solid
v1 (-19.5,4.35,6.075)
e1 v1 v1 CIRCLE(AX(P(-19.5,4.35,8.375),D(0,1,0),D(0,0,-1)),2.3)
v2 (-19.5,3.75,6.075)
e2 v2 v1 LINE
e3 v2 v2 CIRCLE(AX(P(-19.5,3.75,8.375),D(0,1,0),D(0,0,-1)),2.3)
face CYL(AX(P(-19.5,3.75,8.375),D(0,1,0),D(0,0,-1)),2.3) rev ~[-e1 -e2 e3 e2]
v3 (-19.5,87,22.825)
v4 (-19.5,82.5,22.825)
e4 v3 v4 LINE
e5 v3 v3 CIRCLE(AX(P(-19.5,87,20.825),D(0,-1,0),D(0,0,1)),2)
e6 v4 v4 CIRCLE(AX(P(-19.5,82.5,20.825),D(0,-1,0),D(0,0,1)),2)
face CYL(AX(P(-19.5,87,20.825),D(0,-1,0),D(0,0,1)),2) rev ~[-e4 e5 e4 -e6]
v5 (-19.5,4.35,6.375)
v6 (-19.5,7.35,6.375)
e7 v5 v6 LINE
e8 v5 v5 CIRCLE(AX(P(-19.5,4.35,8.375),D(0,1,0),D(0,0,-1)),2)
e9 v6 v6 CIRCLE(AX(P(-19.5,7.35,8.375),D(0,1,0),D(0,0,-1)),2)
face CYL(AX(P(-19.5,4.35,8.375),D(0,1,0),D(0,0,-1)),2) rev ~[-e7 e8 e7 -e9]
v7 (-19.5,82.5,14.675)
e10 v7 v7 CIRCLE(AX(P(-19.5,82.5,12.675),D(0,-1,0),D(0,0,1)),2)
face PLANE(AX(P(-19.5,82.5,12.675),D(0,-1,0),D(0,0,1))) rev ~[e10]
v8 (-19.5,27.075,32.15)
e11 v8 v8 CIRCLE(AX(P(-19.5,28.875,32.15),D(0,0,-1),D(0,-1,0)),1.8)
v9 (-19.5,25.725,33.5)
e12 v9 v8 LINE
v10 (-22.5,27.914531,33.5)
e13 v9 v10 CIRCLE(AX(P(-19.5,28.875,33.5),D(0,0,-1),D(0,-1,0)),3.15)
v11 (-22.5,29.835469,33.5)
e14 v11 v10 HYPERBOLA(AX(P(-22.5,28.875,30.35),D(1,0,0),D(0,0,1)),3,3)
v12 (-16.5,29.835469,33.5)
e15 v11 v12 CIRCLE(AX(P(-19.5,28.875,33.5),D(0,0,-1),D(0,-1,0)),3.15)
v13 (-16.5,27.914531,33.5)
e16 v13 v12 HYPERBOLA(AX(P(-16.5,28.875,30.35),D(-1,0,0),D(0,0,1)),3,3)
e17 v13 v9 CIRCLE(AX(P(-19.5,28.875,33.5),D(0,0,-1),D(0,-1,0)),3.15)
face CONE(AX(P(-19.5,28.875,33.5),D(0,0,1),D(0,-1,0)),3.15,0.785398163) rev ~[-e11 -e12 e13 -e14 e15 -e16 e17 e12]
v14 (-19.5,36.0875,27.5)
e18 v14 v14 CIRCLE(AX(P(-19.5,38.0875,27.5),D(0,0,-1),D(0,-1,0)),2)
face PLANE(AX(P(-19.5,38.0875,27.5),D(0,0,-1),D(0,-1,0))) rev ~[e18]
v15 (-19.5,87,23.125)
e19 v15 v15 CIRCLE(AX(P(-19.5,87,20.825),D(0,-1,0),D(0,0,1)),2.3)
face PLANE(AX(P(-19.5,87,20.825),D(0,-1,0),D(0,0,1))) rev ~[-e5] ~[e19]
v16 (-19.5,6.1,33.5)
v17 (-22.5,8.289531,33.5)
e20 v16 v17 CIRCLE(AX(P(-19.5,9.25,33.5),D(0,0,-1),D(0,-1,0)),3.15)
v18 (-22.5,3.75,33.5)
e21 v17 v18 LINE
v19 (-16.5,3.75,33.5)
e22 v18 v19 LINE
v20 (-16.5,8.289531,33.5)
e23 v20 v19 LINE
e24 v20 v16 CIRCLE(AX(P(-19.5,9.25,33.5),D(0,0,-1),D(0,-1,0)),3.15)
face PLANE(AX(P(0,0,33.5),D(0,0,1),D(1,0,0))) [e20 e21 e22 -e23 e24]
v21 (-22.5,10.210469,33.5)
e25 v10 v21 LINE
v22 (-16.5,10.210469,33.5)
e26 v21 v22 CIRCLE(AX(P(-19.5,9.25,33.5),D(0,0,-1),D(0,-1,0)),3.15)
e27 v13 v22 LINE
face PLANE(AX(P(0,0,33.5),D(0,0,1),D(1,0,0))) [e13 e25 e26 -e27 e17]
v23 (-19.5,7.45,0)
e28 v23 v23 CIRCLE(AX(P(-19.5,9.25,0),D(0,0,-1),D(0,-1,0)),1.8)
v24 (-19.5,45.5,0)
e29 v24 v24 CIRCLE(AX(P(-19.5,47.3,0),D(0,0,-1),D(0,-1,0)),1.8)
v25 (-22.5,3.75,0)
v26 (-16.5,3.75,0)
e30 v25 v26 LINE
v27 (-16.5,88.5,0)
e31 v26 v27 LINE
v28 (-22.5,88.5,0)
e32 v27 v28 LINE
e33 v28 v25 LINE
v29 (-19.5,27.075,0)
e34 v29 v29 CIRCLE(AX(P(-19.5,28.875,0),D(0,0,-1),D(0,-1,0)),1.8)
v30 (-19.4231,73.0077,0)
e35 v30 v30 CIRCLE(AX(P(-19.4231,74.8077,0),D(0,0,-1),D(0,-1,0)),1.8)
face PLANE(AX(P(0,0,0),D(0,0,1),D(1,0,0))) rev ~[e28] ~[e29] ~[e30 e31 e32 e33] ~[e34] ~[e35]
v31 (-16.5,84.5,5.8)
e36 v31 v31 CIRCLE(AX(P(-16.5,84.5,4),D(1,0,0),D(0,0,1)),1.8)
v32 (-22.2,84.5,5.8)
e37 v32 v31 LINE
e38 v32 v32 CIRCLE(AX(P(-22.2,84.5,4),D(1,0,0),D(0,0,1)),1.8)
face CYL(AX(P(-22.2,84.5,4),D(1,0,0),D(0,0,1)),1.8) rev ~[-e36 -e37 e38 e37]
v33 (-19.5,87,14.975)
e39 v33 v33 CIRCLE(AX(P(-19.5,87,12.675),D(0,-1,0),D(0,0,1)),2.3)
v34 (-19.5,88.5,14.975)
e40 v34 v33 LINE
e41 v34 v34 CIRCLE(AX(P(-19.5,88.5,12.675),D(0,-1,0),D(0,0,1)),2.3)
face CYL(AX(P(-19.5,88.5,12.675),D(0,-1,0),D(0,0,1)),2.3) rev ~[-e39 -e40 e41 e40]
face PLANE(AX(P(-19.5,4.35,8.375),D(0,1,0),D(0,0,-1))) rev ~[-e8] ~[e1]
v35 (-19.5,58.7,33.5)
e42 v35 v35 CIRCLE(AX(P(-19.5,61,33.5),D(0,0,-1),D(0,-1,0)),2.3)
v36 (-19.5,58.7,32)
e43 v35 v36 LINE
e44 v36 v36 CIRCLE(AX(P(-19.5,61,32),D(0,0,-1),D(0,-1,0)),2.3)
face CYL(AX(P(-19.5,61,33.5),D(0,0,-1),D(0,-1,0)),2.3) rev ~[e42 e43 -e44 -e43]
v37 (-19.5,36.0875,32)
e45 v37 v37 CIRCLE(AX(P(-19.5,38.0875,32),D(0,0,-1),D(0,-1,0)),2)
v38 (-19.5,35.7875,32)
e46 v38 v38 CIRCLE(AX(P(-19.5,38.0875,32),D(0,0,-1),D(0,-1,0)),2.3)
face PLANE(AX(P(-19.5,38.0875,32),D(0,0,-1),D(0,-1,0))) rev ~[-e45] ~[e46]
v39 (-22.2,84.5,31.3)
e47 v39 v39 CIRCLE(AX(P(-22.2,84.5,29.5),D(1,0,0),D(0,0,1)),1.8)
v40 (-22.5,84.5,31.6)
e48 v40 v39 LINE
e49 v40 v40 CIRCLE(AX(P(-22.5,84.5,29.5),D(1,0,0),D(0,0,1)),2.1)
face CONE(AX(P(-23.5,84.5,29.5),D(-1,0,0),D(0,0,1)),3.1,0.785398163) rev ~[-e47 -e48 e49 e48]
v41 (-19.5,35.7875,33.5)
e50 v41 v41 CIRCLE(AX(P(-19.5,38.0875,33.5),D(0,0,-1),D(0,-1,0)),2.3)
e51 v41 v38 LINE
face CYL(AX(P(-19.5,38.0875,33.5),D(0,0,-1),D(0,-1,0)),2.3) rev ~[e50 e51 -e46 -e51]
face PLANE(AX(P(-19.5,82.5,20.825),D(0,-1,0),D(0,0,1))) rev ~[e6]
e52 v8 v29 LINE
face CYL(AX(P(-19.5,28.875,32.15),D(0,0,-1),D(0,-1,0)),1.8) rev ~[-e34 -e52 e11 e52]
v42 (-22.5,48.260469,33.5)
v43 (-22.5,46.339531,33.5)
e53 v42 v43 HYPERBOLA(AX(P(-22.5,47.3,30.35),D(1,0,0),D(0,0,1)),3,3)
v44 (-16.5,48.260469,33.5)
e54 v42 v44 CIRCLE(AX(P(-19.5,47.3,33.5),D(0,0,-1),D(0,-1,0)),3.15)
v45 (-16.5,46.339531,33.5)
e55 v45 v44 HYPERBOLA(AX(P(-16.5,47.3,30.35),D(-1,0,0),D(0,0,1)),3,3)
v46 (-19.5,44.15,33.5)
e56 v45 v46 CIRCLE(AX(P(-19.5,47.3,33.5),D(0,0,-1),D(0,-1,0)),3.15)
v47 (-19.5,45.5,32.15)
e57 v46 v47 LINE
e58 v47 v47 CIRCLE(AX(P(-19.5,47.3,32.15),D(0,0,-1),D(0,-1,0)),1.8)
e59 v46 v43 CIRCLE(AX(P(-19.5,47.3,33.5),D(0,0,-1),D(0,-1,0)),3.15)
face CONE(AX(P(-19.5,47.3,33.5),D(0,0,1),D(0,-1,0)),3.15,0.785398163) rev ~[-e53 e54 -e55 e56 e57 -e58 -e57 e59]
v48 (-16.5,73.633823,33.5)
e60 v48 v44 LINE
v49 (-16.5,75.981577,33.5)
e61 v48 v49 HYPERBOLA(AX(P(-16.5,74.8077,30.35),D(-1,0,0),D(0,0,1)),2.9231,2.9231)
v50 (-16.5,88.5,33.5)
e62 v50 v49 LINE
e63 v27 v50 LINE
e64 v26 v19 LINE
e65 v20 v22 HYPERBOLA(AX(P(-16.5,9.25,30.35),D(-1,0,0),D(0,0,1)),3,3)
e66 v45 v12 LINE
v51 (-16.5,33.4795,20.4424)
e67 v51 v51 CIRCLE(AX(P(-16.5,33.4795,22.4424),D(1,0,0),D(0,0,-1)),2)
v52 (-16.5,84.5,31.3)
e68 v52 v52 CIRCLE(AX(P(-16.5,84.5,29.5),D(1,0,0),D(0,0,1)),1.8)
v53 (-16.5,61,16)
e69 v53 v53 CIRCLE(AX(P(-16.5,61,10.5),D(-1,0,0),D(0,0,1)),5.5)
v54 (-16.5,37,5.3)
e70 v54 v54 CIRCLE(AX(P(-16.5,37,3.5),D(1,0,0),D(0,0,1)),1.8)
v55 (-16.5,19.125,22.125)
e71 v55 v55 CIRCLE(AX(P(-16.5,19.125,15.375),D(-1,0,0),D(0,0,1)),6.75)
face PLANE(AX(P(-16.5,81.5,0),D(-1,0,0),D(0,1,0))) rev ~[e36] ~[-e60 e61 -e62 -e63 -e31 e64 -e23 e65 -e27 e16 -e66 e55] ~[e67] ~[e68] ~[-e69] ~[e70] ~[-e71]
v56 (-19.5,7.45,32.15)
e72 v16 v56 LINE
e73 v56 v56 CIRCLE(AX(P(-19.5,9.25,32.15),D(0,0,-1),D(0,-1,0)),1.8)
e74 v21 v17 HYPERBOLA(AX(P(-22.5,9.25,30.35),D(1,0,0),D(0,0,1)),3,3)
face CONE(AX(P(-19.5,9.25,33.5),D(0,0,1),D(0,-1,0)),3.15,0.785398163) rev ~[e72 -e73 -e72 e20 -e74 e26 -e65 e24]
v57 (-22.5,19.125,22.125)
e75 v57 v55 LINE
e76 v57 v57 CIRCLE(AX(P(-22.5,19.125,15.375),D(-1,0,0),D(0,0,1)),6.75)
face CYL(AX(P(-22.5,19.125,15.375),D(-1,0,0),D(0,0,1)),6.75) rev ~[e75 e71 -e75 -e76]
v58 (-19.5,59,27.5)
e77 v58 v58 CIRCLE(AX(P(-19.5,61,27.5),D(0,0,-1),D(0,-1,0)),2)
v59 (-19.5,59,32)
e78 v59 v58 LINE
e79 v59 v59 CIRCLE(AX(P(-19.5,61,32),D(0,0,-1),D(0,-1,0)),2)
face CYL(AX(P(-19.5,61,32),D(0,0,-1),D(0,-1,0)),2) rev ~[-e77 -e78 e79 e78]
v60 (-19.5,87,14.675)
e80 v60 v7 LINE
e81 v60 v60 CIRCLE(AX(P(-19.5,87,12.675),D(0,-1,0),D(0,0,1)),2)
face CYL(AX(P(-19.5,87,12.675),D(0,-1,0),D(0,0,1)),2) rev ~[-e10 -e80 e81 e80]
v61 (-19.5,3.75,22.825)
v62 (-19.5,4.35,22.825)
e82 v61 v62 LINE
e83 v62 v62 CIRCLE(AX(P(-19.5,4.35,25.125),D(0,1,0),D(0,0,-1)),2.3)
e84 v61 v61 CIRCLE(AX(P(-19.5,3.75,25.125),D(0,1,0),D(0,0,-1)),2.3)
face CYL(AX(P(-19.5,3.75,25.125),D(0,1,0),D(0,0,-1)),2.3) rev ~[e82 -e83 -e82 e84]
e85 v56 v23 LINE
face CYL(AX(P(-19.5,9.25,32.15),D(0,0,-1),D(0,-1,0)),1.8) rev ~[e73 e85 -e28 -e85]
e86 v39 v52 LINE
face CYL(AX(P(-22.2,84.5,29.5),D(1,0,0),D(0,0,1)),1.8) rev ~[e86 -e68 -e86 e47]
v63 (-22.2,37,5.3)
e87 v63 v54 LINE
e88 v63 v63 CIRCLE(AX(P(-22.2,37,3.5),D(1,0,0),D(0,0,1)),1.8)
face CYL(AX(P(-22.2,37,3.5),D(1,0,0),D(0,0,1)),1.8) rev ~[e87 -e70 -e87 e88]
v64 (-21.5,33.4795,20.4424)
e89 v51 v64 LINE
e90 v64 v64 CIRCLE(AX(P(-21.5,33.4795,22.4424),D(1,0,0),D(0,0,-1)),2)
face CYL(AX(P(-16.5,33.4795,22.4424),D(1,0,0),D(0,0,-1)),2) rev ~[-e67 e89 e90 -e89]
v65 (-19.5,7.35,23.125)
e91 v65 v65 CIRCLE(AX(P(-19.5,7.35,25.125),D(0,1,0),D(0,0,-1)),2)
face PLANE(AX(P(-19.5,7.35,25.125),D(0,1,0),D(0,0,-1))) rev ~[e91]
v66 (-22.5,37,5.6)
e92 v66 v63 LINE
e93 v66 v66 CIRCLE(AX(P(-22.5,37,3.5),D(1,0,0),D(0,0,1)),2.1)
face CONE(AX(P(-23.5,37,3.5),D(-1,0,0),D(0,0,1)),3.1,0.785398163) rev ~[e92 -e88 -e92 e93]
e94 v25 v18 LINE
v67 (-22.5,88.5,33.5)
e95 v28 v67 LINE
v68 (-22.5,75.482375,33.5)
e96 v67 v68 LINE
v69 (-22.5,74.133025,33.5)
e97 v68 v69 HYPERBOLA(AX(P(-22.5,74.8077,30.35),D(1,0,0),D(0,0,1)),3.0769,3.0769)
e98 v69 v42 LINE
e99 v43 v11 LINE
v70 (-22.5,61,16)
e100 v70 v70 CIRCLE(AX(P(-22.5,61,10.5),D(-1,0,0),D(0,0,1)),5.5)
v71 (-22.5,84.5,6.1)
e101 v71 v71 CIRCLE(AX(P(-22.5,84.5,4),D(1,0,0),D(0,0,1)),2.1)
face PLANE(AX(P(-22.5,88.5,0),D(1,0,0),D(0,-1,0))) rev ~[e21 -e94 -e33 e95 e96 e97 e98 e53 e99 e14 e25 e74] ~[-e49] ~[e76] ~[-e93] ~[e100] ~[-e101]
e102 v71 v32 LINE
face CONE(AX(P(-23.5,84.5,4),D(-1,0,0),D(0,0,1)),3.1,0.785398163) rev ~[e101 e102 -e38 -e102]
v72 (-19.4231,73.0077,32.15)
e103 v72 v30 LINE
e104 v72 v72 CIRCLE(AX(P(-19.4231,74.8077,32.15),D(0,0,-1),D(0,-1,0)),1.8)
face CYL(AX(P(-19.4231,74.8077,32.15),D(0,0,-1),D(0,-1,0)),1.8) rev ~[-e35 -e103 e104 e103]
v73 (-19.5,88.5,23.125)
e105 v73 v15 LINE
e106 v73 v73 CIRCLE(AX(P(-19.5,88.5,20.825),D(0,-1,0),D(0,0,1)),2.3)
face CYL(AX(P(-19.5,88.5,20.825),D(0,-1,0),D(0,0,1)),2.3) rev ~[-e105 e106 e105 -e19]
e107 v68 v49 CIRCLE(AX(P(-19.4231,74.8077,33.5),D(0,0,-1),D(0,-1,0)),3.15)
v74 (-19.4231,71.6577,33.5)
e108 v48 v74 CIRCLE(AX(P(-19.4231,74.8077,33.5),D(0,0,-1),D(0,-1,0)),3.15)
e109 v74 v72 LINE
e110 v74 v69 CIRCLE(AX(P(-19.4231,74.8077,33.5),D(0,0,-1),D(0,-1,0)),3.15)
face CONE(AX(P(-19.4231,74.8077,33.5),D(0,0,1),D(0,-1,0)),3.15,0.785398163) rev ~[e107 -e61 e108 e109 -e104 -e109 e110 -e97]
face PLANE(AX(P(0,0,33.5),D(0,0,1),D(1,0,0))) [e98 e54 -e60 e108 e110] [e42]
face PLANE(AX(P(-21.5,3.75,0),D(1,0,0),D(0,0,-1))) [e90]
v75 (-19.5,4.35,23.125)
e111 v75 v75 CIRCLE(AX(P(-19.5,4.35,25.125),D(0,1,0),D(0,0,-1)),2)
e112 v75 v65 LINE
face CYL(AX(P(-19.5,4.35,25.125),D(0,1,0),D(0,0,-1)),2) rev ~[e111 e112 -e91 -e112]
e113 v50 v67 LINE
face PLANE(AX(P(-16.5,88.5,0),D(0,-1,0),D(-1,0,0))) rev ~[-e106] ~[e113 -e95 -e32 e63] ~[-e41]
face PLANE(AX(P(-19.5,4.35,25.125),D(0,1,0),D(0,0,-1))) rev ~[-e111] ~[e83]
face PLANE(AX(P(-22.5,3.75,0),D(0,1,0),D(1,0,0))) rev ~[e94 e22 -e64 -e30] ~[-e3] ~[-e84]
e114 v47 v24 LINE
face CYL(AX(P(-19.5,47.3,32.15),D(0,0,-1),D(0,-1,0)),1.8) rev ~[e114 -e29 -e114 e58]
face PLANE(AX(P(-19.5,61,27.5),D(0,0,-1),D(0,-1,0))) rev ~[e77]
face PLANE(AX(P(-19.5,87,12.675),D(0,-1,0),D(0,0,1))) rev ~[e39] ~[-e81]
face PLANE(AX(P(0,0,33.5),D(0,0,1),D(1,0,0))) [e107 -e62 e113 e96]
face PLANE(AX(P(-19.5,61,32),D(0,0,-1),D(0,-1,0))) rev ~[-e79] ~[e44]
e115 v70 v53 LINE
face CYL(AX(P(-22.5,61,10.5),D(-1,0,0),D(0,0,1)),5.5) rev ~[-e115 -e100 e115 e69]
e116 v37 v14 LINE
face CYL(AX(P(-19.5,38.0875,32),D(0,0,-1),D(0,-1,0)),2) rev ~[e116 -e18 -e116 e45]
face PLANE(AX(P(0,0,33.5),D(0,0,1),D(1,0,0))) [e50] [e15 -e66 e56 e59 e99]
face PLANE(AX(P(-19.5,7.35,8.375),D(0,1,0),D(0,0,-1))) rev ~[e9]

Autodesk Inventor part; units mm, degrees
ref_plane "YZ Plane" through (0, 0, 0) normal (1, 0, 0) x (0, 1, 0)
ref_plane "XZ Plane" through (0, 0, 0) normal (0, 1, 0) x (-1, 0, 0)
ref_plane "Work Plane1" through (0, 0, 0) normal (0, 0, 1) x (1, 0, 0)
sketch "Sketch1" plane through (0, 0, 0) normal (0, 0, 1) x (1, 0, 0)
  line L0 (23.5, 88.5) -> (-23.5, 88.5) projected
  line L1 (-23.5, 88.5) -> (-23.5, 36.5) projected
  line L2 (-26.5, 33.5) -> (-89, 33.5) projected
  line L3 (-89, 33.5) -> (-89, -72.5) projected
  line L4 (-89, -72.5) -> (-77, -72.5) projected
  line L5 (-74, -75.5) -> (-74, -93.5) projected
  line L6 (-74, -93.5) -> (74, -93.5) projected
  line L7 (74, -93.5) -> (74, -75.5) projected
  line L8 (77, -72.5) -> (89, -72.5) projected
  line L9 (89, -72.5) -> (89, 33.5) projected
  line L10 (89, 33.5) -> (26.5, 33.5) projected
  line L11 (23.5, 36.5) -> (23.5, 88.5) projected
  line L12 (-4.5, 81.5) -> (-4.5, 36.5) projected
  line L13 (-7.5, 33.5) -> (-13.5, 33.5) projected
  line L14 (-16.5, 36.5) -> (-16.5, 81.5) projected
  line L15 (-13.5, 84.5) -> (-7.5, 84.5) projected
  line L16 (16.5, 81.5) -> (16.5, 36.5) projected
  line L17 (13.5, 33.5) -> (7.5, 33.5) projected
  line L18 (4.5, 36.5) -> (4.5, 81.5) projected
  line L19 (7.5, 84.5) -> (13.5, 84.5) projected
  line L20 (-16.5, 88.5) -> (-22.5, 88.5)
  line L21 (-22.5, 88.5) -> (-22.5, 3.75)
  line L22 (-22.5, 3.75) -> (-16.5, 3.75)
  line L23 (-16.5, 3.75) -> (-16.5, 88.5)
  line L24 (-32.2, 4.75) -> (-59.9, 4.75)
  arc A0 (13.5, 33.5) -> (16.5, 36.5) centre (13.5, 36.5) ccw projected
  arc A1 (4.5, 36.5) -> (7.5, 33.5) centre (7.5, 36.5) ccw projected
  arc A2 (7.5, 84.5) -> (4.5, 81.5) centre (7.5, 81.5) ccw projected
  arc A3 (16.5, 81.5) -> (13.5, 84.5) centre (13.5, 81.5) ccw projected
  arc A4 (-4.5, 81.5) -> (-7.5, 84.5) centre (-7.5, 81.5) ccw projected
  arc A5 (-7.5, 33.5) -> (-4.5, 36.5) centre (-7.5, 36.5) ccw projected
  arc A6 (-16.5, 36.5) -> (-13.5, 33.5) centre (-13.5, 36.5) ccw projected
  arc A7 (-13.5, 84.5) -> (-16.5, 81.5) centre (-13.5, 81.5) ccw projected
  arc A8 (-26.5, 33.5) -> (-23.5, 36.5) centre (-26.5, 36.5) ccw projected
  arc A9 (-74, -75.5) -> (-77, -72.5) centre (-77, -75.5) ccw projected
  arc A10 (77, -72.5) -> (74, -75.5) centre (77, -75.5) ccw projected
  arc A11 (23.5, 36.5) -> (26.5, 33.5) centre (26.5, 36.5) ccw projected
  point P0 (0, 0)
  point P1 (-16.5, 36.5)
  point P2 (-16.5, 81.5)
  dimension "d0" = 1
  dimension "d2" = 1
ref_plane "Work Plane2" through (-89, -40.3889, 33.5) normal (0, 0, 1) x (1, 0, 0)
extrude "Extrusion1" add sketch "Sketch1" along normal up to surface (33.5 mm away) contours L23 L14 L22 L21 L0
sketch "Sketch2" plane through (-22.5, 3.75, 0) normal (-1, 0, 0) x (0, 0, 1)
  arc A0 (13.7043, 9.7757) -> (14.863, 11.545) centre (10.3771, 13.2188) ccw projected
  arc A1 (14.863, 11.545) -> (15.4685, 11.512) centre (15.375, 15.375) ccw projected
  arc A2 (15.4685, 11.512) -> (16.4285, 9.6275) centre (20.1095, 12.6893) ccw projected
  arc A3 (16.4285, 9.6275) -> (17.3146, 9.863) centre (15.375, 15.375) ccw projected
  arc A4 (17.3146, 9.863) -> (17.2121, 11.9755) centre (12.599, 10.6929) ccw projected
  arc A5 (17.2121, 11.9755) -> (17.7212, 12.3047) centre (15.375, 15.375) ccw projected
  arc A6 (17.7212, 12.3047) -> (19.6056, 11.3444) centre (20.7839, 15.9851) ccw projected
  arc A7 (19.6056, 11.3444) -> (20.184, 12.0558) centre (15.375, 15.375) ccw projected
  arc A8 (20.184, 12.0558) -> (18.8594, 13.7045) centre (15.8813, 9.9554) ccw projected
  arc A9 (18.8594, 13.7045) -> (19.0778, 14.2702) centre (15.375, 15.375) ccw projected
  arc A10 (19.0778, 14.2702) -> (21.1668, 14.6008) centre (19.3923, 19.0479) ccw projected
  arc A11 (21.1668, 14.6008) -> (21.2166, 15.5164) centre (15.375, 15.375) ccw projected
  arc A12 (21.2166, 15.5164) -> (19.1758, 16.0716) centre (18.9701, 11.288) ccw projected
  arc A13 (19.1758, 16.0716) -> (19.02, 16.6576) centre (15.375, 15.375) ccw projected
  arc A14 (19.02, 16.6576) -> (20.5157, 18.153) centre (16.4662, 20.7077) ccw projected
  arc A15 (20.5157, 18.153) -> (20.0178, 18.923) centre (15.375, 15.375) ccw projected
  arc A16 (20.0178, 18.923) -> (18.0404, 18.1726) centre (20.6858, 14.1817) ccw projected
  arc A17 (18.0404, 18.1726) -> (17.57, 18.5552) centre (15.375, 15.375) ccw projected
  arc A18 (17.57, 18.5552) -> (17.9011, 20.644) centre (13.1233, 20.3306) ccw projected
  arc A19 (17.9011, 20.644) -> (17.0457, 20.9743) centre (15.375, 15.375) ccw projected
  arc A20 (17.0457, 20.9743) -> (15.887, 19.205) centre (20.3729, 17.5312) ccw projected
  arc A21 (15.887, 19.205) -> (15.2815, 19.238) centre (15.375, 15.375) ccw projected
  arc A22 (15.2815, 19.238) -> (14.3215, 21.1225) centre (10.6405, 18.0607) ccw projected
  arc A23 (14.3215, 21.1225) -> (13.4354, 20.887) centre (15.375, 15.375) ccw projected
  arc A24 (13.4354, 20.887) -> (13.5379, 18.7745) centre (18.151, 20.0571) ccw projected
  arc A25 (13.5379, 18.7745) -> (13.0288, 18.4453) centre (15.375, 15.375) ccw projected
  arc A26 (13.0288, 18.4453) -> (11.1444, 19.4056) centre (9.9661, 14.7649) ccw projected
  arc A27 (11.1444, 19.4056) -> (10.566, 18.6942) centre (15.375, 15.375) ccw projected
  arc A28 (10.566, 18.6942) -> (11.8906, 17.0455) centre (14.8687, 20.7946) ccw projected
  arc A29 (11.8906, 17.0455) -> (11.6722, 16.4798) centre (15.375, 15.375) ccw projected
  arc A30 (11.6722, 16.4798) -> (9.5832, 16.1492) centre (11.3577, 11.7021) ccw projected
  arc A31 (9.5832, 16.1492) -> (9.5334, 15.2336) centre (15.375, 15.375) ccw projected
  arc A32 (9.5334, 15.2336) -> (11.5742, 14.6784) centre (11.7799, 19.462) ccw projected
  arc A33 (11.5742, 14.6784) -> (11.73, 14.0924) centre (15.375, 15.375) ccw projected
  arc A34 (11.73, 14.0924) -> (10.2343, 12.597) centre (14.2838, 10.0423) ccw projected
  arc A35 (10.2343, 12.597) -> (10.7322, 11.827) centre (15.375, 15.375) ccw projected
  arc A36 (10.7322, 11.827) -> (12.7096, 12.5774) centre (10.0642, 16.5683) ccw projected
  arc A37 (12.7096, 12.5774) -> (13.18, 12.1948) centre (15.375, 15.375) ccw projected
  arc A38 (13.18, 12.1948) -> (12.8489, 10.106) centre (17.6267, 10.4194) ccw projected
  arc A39 (12.8489, 10.106) -> (13.7043, 9.7757) centre (15.375, 15.375) ccw projected
  circle A40 centre (15.375, 15.375) radius 6.75
  circle A41 centre (15.375, 15.375) radius 5.8433
  line L0 (21.2183, 15.375) -> (22.125, 15.375)
  circle A42 centre (10.5, 57.25) radius 5.5 projected
  point P0 (0, -3.75)
  dimension "d6" = 13.5
  dimension "d5" = 0.9067
  dimension "d9" = 11
extrude "Extrusion2" cut sketch "Sketch2" against normal up to next contours A39 A38 A37 A36 A35 A34 A33 A32 A31 A30 A29 A28 A27 A26 A25 A24 A23 A22 A21 A20 A19 A18 A17 A16 A15 A14 A13 A12 A11 A10 A9 A8 A7 A6 A5 A4 A3 A2 A1 A0 | A0 A1 A2 A41 | A41 A36 A37 A38 | A4 A5 A6 A41 | A41 A32 A33 A34 | A8 A9 A10 A41 | A41 A28 A29 A30 | A41 A24 A25 A26 | A12 A13 A14 A41 | A41 A20 A21 A22 | A16 A17 A18 A41 | A40 | A42
sketch "Sketch3" plane through (-16.5, 3.75, 0) normal (1, 0, 0) x (0, 0, -1)
  circle A0 centre (-22.4424, 29.7295) radius 2 projected
  point P0 (0, -3.75)
extrude "Extrusion3" cut sketch "Sketch3" against normal blind 5
ref_plane "Work Plane3" through (-23.5, 3.75, 0) normal (-1, 0, 0) x (0, 0, 1)
sketch "Sketch5" plane through (-23.5, 3.75, 0) normal (-1, 0, 0) x (0, 0, 1)
  circle A0 centre (29.5, 80.75) radius 2.1 projected
  circle A1 centre (4, 80.75) radius 2.1 projected
  circle A2 centre (3.5, 33.25) radius 2.1 projected
  point P0 (0, -3.75)
hole "Hole1" at (-23.5, 84.5, 29.5) at (-23.5, 84.5, 4) at (-23.5, 37, 3.5) direction (1, 0, 0) diameter 3.6 end through all countersink diameter 6.2 countersink angle 90 clearance for "Countersunk Flat Head Screw ISO 2009/7046" size "M3" standard "ISO"
sketch "Sketch6" plane through (-22.5, 3.75, 33.5) normal (0, 0, 1) x (1, 0, 0)
  line L0 (0, 8.625) -> (0, 22.125) projected
  line L1 (1, 31.7295) -> (1, 27.7295) projected
  line L2 (0, 31.15) -> (0, 35.35) projected
  line L3 (0, 51.75) -> (0, 62.75) projected
  line L4 (0, 78.65) -> (0, 82.85) projected
  line L5 (0, 78.65) -> (0, 82.85) projected
  line L6 (6, 0) -> (0, 0) projected
  line L7 (6, 84.75) -> (6, 0) projected
  line L8 (0, 84.75) -> (6, 84.75) projected
  line L9 (0, 0) -> (0, 84.75) projected
  line L10 (6, 28.125) -> (0, 28.125)
  line L11 (0, 28.125) -> (0, 35.35)
  line L12 (0, 35.35) -> (6, 35.35)
  line L13 (6, 35.35) -> (6, 28.125)
  line L14 (0, 8.625) -> (6, 8.625) projected
  line L15 (6, 8.625) -> (0, 8.625)
  line L16 (0, 8.625) -> (0, 22.125)
  line L17 (0, 22.125) -> (6, 22.125)
  line L18 (6, 22.125) -> (6, 8.625)
  line L19 (6, 78.95) -> (0.3, 78.95) projected
  line L20 (6, 84.75) -> (0, 84.75) projected
  line L21 (6, 78.95) -> (0, 78.95)
  line L22 (0, 78.95) -> (0, 84.75)
  line L23 (0, 84.75) -> (6, 84.75)
  line L24 (6, 84.75) -> (6, 78.95)
  line L25 (0, 51.75) -> (6, 51.75) projected
  line L26 (0, 51.75) -> (0, 62.75) projected
  line L27 (6, 51.75) -> (0, 51.75)
  line L28 (0, 51.75) -> (0, 62.75)
  line L29 (0, 62.75) -> (6, 62.75)
  line L30 (6, 62.75) -> (6, 51.75)
  line L31 (6, 0) -> (0, 0)
  line L32 (0, 0) -> (0, 3.7)
  line L33 (0, 3.7) -> (6, 3.7)
  line L34 (6, 3.7) -> (6, 0)
  circle A0 centre (3, 5.5) radius 1.8
  line L35 (6, 22.125) -> (0, 28.125)
  line L36 (0, 22.125) -> (6, 28.125)
  line L37 (6, 35.35) -> (0, 51.75)
  line L38 (0, 35.35) -> (6, 51.75)
  line L39 (0.3, 82.55) -> (0.3, 78.95) projected
  line L40 (6, 62.75) -> (0.3, 78.95)
  line L41 (6, 82.55) -> (6, 78.95) projected
  line L42 (0.3, 78.95) -> (6, 78.95)
  line L43 (6, 78.95) -> (0, 62.75)
  point P0 (22.5, -3.75)
  point P1 (3, 25.125)
  point P2 (3.0769, 71.0577)
  point P3 (3, 43.55)
  dimension "d20" = 3.7
  dimension "d21" = 3.6
  dimension "d22" = 3
  dimension "d23" = 3
hole "Hole2" at (-19.5, 28.875, 33.5) at (-19.5, 9.25, 33.5) at (-19.4231, 74.8077, 33.5) at (-19.5, 47.3, 33.5) direction (0, 0, -1) diameter 3.6 end through all countersink diameter 6.3 countersink angle 90 clearance for "Countersunk Flat Head Screw ISO 2009/7046" size "M3" standard "ISO"
sketch "Sketch7" plane through (-22.5, 3.75, 0) normal (0, -1, 0) x (1, 0, 0)
  line L0 (6, 33.5) -> (0, 33.5) projected
  line L1 (0, 0) -> (0, 33.5) projected
  line L2 (0, 0) -> (6, 0) projected
  line L3 (6, 0) -> (6, 33.5) projected
  line L4 (0, 0) -> (0, 33.5) projected
  line L5 (0, 16.75) -> (6, 16.75)
  line L6 (6, 16.75) -> (0, 33.5)
  line L7 (6, 16.75) -> (0, 0)
  line L8 (6, 0) -> (0, 0) projected
  line L9 (6, 0) -> (0, 16.75)
  line L10 (0, 33.5) -> (6, 33.5) projected
  line L11 (6, 33.5) -> (0, 16.75)
  point P0 (22.5, 0)
  point P1 (3, 25.125)
  point P2 (3, 8.375)
hole "Hole3" at (-19.5, 3.75, 25.125) at (-19.5, 3.75, 8.375) direction (0, 1, 0) diameter 4 depth 3.6 counterbore diameter 4.6 counterbore depth 0.6
sketch "Sketch9" plane through (-22.5, 88.5, 0) normal (0, 1, 0) x (1, 0, 0)
  circle A0 centre (22.5, -20.825) radius 2.3 projected
  circle A1 centre (22.5, -12.675) radius 2.3 projected
  line L0 (18, -33.5) -> (27, -33.5) projected
  line L1 (27, 0) -> (27, -33.5) projected
  line L2 (27, 0) -> (18, 0) projected
  line L3 (18, 0) -> (18, -33.5) projected
  line L4 (22.5, -20.825) -> (0, -20.825)
  line L5 (0, -22.125) -> (0, -8.625) projected
  line L6 (22.5, -12.675) -> (0, -12.675)
  line L7 (6, 0) -> (6, -33.5) projected
  point P0 (22.5, 0)
  point P1 (3, -20.825)
  point P2 (3, -12.675)
  dimension "d45" = 3
  dimension "d46" = 3
  dimension "d47" = 3
  dimension "d48" = 3
hole "Hole5" at (-19.5, 88.5, 20.825) at (-19.5, 88.5, 12.675) direction (0, -1, 0) diameter 4 depth 6 counterbore diameter 4.6 counterbore depth 1.5
sketch "Sketch10" plane through (-19.5, 47.3, 33.5) normal (0, 0, 1) x (1, 0, 0)
  line L0 (-3, 8.2) -> (-3, 19.2) projected
  arc A0 (3, -17.4645) -> (-3, -17.4645) centre (0, -18.425) ccw projected
  arc A1 (-3, -0.9605) -> (3, -0.9605) centre (0, 0) ccw projected
  arc A2 (3, -17.4645) -> (-3, -17.4645) centre (0, -18.425) ccw projected
  line L1 (3, -0.9605) -> (3, -17.4645) projected
  arc A3 (-3, -0.9605) -> (3, -0.9605) centre (0, 0) ccw projected
  line L2 (-3, -17.4645) -> (-3, -0.9605) projected
  line L3 (3, 8.2) -> (-3, 8.2)
  line L4 (3, 19.2) -> (-3, 19.2)
  line L5 (-3, 19.2) -> (3, 8.2)
  line L6 (-3, 8.2) -> (3, 19.2)
  line L7 (3, -17.4645) -> (-3, -0.9605)
  line L8 (-3, -17.4645) -> (3, -0.9605)
  point P0 (19.5, -47.3)
  point P1 (0, -9.2125)
  point P2 (0, 13.7)
hole "Hole6" at (-19.5, 38.0875, 33.5) at (-19.5, 61, 33.5) direction (0, 0, -1) diameter 4 depth 6 counterbore diameter 4.6 counterbore depth 1.5
equation "\"d22\" = d23"
equation "\"d45\" = d46"
equation "\"d47\" = d48"
properties part number "right_gear_holder"
